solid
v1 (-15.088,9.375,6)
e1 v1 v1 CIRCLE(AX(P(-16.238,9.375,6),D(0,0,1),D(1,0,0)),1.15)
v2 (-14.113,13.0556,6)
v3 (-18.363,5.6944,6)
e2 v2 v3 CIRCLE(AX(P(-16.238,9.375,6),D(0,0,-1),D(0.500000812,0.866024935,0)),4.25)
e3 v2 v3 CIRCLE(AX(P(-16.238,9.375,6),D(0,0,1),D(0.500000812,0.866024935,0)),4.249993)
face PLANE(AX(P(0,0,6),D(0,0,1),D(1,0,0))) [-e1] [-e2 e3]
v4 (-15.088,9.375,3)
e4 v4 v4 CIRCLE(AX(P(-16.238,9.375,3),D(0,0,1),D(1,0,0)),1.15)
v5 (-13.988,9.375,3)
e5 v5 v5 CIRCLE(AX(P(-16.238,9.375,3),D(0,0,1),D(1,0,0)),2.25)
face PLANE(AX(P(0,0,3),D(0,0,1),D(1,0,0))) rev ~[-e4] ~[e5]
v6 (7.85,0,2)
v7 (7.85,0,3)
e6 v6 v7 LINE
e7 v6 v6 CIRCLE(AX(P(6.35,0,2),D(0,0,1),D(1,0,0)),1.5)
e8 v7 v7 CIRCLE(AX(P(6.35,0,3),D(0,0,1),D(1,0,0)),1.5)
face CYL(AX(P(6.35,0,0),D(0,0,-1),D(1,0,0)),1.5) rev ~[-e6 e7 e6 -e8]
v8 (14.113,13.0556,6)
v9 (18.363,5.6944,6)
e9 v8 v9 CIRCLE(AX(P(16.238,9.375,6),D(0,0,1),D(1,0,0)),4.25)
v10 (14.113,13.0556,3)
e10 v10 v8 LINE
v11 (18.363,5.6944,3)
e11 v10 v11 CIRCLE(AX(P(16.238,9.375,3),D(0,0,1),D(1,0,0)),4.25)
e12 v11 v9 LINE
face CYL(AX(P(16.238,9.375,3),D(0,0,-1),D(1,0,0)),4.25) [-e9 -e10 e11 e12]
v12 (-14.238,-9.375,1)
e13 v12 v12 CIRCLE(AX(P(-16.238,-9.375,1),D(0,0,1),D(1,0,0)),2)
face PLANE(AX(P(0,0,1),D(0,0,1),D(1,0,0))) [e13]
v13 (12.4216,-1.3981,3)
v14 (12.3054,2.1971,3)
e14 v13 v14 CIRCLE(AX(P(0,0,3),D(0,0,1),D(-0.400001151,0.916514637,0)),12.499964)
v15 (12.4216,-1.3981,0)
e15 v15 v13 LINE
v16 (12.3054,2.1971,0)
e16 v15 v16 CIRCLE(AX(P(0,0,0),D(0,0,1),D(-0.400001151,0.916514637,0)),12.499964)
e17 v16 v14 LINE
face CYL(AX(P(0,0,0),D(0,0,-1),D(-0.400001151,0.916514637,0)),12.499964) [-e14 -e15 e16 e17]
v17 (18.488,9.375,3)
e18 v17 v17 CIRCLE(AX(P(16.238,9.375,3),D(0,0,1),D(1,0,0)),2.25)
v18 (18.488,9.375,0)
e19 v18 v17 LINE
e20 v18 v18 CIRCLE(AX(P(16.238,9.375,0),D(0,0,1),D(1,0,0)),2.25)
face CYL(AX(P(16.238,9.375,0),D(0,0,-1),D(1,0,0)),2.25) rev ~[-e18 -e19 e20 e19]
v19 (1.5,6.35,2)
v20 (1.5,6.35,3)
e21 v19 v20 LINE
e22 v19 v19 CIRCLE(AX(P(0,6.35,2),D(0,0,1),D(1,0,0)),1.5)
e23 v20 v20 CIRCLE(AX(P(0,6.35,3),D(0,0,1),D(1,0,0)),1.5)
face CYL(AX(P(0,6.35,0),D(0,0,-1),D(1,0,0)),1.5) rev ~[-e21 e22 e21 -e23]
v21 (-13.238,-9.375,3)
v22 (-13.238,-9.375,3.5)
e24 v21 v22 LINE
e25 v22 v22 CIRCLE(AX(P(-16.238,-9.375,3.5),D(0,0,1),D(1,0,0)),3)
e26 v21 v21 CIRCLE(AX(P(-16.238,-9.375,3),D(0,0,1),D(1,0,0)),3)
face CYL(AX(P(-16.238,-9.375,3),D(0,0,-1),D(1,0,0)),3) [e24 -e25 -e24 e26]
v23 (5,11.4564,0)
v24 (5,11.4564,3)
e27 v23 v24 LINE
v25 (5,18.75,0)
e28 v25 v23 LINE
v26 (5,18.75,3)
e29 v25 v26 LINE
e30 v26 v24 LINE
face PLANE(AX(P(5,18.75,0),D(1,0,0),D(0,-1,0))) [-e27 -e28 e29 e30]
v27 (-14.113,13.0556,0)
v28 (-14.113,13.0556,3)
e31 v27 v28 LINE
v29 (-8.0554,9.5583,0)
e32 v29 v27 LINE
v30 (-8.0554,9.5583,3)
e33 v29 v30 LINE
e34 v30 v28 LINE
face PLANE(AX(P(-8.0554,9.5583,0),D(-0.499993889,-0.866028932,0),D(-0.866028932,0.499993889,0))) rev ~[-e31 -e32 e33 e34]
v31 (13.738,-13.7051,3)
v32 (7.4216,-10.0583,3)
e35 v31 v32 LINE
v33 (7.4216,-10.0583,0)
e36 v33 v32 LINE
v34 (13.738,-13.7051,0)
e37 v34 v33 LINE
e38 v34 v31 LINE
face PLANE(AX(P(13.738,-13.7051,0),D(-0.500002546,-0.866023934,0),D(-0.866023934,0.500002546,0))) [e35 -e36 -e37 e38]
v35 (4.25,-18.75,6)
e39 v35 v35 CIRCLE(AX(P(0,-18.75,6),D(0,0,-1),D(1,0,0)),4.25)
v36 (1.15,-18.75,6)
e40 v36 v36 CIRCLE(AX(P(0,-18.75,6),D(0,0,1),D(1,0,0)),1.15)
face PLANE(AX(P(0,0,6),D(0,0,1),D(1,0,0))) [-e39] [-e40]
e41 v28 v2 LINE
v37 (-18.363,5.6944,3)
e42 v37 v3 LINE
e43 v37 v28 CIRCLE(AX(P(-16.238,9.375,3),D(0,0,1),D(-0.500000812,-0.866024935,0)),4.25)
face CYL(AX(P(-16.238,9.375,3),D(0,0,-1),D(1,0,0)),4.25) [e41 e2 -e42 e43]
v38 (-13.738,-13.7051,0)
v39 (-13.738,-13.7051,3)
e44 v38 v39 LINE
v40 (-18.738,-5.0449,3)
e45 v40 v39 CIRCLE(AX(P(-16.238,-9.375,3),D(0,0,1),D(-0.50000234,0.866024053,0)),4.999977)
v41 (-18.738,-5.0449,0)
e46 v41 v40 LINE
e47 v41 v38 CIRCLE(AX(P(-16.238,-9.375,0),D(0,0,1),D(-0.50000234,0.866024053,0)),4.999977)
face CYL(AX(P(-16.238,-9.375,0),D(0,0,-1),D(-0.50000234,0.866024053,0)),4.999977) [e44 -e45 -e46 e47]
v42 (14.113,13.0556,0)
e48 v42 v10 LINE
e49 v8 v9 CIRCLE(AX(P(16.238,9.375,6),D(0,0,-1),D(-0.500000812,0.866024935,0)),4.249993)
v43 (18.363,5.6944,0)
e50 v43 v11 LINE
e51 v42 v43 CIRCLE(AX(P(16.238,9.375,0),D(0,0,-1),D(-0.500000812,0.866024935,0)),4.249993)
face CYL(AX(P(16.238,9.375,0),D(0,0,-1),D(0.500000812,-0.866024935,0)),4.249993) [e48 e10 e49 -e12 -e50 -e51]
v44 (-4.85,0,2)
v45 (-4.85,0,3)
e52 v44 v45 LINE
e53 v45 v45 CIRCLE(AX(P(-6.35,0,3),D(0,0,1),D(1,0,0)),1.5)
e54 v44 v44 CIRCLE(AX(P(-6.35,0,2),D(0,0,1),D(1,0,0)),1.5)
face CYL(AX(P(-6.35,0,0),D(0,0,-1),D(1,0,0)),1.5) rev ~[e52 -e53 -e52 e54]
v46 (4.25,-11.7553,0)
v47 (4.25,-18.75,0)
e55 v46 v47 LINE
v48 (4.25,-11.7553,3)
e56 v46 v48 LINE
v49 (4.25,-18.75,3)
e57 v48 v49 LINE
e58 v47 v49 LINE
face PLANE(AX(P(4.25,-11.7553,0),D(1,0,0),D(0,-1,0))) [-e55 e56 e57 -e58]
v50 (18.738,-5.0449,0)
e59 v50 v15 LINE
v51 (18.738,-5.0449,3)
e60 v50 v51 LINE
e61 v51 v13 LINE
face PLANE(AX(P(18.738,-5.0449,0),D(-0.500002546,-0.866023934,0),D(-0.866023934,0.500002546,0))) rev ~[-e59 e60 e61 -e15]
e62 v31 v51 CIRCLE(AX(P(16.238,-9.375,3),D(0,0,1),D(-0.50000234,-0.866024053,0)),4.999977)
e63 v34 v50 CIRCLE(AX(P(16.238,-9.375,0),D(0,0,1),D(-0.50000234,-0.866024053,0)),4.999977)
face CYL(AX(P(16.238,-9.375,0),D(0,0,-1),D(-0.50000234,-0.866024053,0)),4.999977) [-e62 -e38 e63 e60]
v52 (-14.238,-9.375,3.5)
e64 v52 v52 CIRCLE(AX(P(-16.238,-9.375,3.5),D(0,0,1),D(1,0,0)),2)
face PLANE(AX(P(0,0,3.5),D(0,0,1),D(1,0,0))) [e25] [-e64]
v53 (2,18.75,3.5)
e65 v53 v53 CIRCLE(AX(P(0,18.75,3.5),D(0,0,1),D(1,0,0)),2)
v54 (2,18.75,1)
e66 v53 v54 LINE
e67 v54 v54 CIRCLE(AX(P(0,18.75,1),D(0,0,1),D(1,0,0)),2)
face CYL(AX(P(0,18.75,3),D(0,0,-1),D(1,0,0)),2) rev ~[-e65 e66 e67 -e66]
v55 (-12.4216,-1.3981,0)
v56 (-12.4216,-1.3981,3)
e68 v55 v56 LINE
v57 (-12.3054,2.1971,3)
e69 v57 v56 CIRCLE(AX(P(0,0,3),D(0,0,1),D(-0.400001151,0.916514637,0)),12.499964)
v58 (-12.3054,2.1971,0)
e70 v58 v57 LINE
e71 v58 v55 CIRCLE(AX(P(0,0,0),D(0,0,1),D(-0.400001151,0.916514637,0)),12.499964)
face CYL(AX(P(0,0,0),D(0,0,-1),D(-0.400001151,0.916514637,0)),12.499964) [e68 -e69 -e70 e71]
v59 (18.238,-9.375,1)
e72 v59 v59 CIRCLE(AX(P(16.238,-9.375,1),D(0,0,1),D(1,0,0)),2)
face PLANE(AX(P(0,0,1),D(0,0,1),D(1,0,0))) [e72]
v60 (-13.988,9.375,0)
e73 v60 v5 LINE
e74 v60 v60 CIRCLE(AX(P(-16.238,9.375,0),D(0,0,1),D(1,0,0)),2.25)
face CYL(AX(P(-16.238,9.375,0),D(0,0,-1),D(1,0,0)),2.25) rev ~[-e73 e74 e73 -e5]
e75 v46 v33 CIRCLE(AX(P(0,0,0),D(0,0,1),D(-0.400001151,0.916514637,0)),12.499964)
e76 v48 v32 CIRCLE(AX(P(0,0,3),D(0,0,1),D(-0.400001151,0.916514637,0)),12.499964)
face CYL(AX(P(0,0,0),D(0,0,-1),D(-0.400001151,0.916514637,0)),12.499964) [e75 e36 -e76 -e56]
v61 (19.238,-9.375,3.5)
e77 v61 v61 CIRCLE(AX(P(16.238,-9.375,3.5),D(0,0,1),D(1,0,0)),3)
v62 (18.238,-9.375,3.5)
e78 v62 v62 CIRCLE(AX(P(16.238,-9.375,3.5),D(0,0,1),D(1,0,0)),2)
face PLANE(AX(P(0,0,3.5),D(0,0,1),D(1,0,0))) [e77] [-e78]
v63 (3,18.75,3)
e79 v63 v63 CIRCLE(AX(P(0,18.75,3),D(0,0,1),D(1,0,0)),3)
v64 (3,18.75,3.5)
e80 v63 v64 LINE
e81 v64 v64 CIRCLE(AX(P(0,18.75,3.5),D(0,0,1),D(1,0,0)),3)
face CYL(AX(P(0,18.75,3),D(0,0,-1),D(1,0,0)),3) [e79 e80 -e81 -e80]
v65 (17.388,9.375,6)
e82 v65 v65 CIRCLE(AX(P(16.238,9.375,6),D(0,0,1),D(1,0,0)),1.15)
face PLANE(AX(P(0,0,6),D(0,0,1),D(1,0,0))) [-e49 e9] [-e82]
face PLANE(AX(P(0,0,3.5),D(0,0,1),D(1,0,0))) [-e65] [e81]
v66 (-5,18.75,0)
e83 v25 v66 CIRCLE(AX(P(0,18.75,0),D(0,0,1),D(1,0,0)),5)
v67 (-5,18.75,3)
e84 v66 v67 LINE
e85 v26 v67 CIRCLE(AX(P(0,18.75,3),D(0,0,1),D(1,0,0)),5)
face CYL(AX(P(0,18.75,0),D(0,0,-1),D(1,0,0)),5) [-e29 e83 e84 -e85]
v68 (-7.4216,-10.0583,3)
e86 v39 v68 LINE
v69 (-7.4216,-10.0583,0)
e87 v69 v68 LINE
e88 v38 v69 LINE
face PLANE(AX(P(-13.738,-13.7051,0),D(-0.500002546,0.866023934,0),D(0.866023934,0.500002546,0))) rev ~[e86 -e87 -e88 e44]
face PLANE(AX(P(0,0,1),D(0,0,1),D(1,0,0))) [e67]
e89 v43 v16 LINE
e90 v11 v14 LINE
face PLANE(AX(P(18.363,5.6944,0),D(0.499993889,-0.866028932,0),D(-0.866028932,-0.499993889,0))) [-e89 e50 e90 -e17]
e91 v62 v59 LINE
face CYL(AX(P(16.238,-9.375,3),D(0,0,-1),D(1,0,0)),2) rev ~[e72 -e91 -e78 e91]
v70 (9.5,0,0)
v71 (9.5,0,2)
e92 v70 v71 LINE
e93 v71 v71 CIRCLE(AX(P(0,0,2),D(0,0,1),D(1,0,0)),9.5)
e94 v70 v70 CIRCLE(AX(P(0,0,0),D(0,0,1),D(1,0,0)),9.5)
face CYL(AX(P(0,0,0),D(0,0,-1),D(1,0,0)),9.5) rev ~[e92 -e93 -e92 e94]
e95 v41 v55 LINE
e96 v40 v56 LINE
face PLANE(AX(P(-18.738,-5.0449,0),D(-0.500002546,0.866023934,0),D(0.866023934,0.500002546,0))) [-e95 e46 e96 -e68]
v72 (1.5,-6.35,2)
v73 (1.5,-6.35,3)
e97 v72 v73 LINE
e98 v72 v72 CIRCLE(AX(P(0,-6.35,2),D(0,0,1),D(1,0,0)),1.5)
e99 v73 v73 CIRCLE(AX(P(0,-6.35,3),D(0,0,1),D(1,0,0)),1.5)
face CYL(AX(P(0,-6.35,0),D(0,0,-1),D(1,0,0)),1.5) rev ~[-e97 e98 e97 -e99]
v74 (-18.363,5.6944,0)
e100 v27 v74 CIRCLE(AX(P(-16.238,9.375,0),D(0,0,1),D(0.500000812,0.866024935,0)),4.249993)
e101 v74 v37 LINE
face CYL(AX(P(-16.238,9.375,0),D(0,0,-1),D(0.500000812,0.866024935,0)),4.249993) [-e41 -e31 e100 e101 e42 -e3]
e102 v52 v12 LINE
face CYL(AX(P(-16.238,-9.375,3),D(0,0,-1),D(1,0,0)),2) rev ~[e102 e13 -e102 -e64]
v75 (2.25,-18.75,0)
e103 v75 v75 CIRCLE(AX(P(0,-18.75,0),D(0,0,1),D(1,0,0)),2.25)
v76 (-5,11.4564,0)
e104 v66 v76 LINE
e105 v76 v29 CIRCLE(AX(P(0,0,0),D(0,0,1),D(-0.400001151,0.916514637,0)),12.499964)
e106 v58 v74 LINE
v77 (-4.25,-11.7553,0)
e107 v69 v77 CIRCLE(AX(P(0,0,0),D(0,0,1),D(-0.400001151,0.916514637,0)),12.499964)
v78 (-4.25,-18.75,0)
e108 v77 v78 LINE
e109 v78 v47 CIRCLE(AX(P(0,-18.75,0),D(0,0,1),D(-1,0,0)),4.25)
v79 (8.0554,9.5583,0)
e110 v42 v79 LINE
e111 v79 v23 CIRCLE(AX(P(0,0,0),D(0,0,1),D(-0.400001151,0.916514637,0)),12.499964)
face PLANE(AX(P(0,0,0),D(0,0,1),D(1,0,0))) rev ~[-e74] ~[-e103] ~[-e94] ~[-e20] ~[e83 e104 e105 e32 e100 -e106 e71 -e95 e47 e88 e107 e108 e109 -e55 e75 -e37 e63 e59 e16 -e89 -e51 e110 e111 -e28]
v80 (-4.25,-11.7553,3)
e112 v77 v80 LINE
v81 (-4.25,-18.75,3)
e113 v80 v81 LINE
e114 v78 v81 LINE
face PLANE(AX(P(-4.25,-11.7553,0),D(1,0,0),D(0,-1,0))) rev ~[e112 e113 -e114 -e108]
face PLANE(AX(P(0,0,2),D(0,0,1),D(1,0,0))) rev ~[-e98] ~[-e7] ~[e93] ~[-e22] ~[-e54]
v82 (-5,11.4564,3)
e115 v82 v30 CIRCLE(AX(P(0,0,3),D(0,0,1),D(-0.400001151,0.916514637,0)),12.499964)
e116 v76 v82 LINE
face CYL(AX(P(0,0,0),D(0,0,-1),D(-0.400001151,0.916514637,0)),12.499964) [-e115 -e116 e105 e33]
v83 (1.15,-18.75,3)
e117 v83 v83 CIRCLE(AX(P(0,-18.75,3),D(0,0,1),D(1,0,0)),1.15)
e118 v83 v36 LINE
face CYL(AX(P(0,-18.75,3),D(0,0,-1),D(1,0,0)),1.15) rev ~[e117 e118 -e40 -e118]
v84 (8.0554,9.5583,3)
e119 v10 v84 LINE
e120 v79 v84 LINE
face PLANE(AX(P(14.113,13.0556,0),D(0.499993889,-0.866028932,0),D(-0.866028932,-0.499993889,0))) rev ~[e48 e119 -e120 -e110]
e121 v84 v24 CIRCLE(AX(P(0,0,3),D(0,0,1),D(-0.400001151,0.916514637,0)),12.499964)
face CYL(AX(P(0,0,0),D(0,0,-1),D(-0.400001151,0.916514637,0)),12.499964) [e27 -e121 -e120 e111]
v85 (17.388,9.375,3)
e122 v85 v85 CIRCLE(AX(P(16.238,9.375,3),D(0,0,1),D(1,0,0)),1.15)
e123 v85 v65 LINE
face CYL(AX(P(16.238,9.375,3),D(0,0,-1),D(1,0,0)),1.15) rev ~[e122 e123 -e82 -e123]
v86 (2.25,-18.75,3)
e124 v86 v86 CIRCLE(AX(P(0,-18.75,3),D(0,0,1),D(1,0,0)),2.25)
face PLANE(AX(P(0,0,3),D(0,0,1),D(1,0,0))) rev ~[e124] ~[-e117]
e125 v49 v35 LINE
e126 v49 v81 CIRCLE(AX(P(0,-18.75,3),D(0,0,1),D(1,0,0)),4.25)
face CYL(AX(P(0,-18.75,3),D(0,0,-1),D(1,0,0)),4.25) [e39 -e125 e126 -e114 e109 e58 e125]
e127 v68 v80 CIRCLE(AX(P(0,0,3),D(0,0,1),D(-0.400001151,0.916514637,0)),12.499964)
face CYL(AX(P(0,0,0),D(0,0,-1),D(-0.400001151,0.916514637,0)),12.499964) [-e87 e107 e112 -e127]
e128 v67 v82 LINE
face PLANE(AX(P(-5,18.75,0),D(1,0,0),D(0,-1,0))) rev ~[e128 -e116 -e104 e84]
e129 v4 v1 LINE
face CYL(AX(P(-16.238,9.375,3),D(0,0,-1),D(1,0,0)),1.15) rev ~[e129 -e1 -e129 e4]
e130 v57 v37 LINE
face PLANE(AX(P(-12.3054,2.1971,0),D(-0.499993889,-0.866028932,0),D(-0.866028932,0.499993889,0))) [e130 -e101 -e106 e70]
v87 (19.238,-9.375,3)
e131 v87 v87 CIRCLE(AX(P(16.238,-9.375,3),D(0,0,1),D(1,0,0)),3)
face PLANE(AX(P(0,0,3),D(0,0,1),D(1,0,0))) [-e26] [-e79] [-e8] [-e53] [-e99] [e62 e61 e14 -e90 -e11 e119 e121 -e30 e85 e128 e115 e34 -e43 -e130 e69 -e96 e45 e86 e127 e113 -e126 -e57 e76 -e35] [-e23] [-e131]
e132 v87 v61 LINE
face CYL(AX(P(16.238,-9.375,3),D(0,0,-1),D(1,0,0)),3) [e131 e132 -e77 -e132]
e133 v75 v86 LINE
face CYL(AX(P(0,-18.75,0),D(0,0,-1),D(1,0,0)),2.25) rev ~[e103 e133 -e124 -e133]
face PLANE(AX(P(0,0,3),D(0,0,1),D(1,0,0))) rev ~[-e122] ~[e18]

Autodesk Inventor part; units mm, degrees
ref_plane "YZ Plane" through (0, 0, 0) normal (1, 0, 0) x (0, 1, 0)
ref_plane "XZ Plane" through (0, 0, 0) normal (0, 1, 0) x (-1, 0, 0)
ref_plane "XY Plane" through (0, 0, 0) normal (0, 0, 1) x (1, 0, 0)
sketch "Skizze1" plane through (0, 0, 0) normal (0, 0, 1) x (1, 0, 0)
  circle A0 centre (0, 0) radius 18.75 construction
  circle A1 centre (0, 0) radius 9.5
  circle A2 centre (0, 18.75) radius 2
  line L0 (0, 0) -> (-16.238, -9.375) construction
  line L1 (0, 33.1) -> (0, -32.35) construction
  line L2 (-32.2953, 0) -> (32.2953, 0) construction
  circle A3 centre (0, 0) radius 6.35 construction
  circle A4 centre (0, 6.35) radius 1.5
  circle A5 centre (0, -6.35) radius 1.5
  circle A6 centre (6.35, 0) radius 1.5
  circle A7 centre (-6.35, 0) radius 1.5
  arc A8 (-5, 11.4564) -> (5, 11.4564) centre (0, 0) ccw
  arc A9 (5, 18.75) -> (-5, 18.75) centre (0, 18.75) ccw
  line L3 (-5, 18.75) -> (-5, 11.4564)
  line L4 (5, 18.75) -> (5, 11.4564)
  circle A10 centre (16.238, -9.375) radius 2
  arc A11 (13.738, -13.7051) -> (18.738, -5.0449) centre (16.238, -9.375) ccw
  line L5 (18.738, -5.0449) -> (12.4216, -1.3981)
  line L6 (13.738, -13.7051) -> (7.4216, -10.0583)
  circle A12 centre (-16.238, -9.375) radius 2
  arc A13 (-18.738, -5.0449) -> (-13.738, -13.7051) centre (-16.238, -9.375) ccw
  line L7 (-18.738, -5.0449) -> (-12.4216, -1.3981)
  line L8 (-13.738, -13.7051) -> (-7.4216, -10.0583)
  circle A14 centre (0, 18.75) radius 3
  circle A15 centre (16.238, -9.375) radius 3
  circle A16 centre (-16.238, -9.375) radius 3
  circle A17 centre (0, -18.75) radius 1.15
  circle A18 centre (16.238, 9.375) radius 1.15
  circle A19 centre (-16.238, 9.375) radius 1.15
  circle A20 centre (16.238, 9.375) radius 2.25
  circle A21 centre (0, -18.75) radius 2.25
  circle A22 centre (-16.238, 9.375) radius 2.25
  arc A23 (18.363, 5.6944) -> (14.113, 13.0556) centre (16.238, 9.375) ccw
  arc A24 (-4.25, -18.75) -> (4.25, -18.75) centre (0, -18.75) ccw
  arc A25 (-14.113, 13.0556) -> (-18.363, 5.6944) centre (-16.238, 9.375) ccw
  line L9 (18.363, 5.6944) -> (12.3054, 2.1971)
  line L10 (14.113, 13.0556) -> (8.0554, 9.5583)
  line L11 (4.25, -11.7553) -> (4.25, -18.75)
  line L12 (-4.25, -11.7553) -> (-4.25, -18.75)
  line L13 (-8.0554, 9.5583) -> (-14.113, 13.0556)
  line L14 (-12.3054, 2.1971) -> (-18.363, 5.6944)
  circle A26 centre (0, -18.75) radius 4.25
  circle A27 centre (16.238, 9.375) radius 4.25
  circle A28 centre (-16.238, 9.375) radius 4.25
  dimension "d0" = 37.5
  dimension "d1" = 4
  dimension "d2" = 30
  dimension "d3" = 19
  dimension "d4" = 12.7
  dimension "d5" = 3
  dimension "d7" = 3
  dimension "d8" = 3
  dimension "d17" = 1
  dimension "d20" = 2.3
  dimension "d22" = 2
  dimension "d23" = 4.5
extrude "Extrusion1" add sketch "Skizze1" along normal blind 3 contours A1 | A2 | L3 A9 L4 A8 | A8 L14 A28 L13 | A28 A25 | A8 L8 A13 L7 | L10 A27 L9 A8 | A8 L11 A26 L12 | A23 A27 | A26 A24 | L5 A11 L6 A8 | A10 | A12 | A14 | A15 | A16
extrude "Extrusion3" cut sketch "Skizze1" along normal blind 2 contours A1
extrude "Extrusion4" cut sketch "Skizze1" against normal blind 2 from surface at 3 contours A2 | A10 | A12
extrude "Extrusion5" add sketch "Skizze1" along normal blind 0.5 from surface at 3 contours A14 | A15 | A16
extrude "Extrusion6" add sketch "Skizze1" along normal blind 3 from surface at 3 contours A28 A25 | A23 A27 | A26 A24 | A20 | A21 | A22
properties part number "PlanetaryHolderTop"
